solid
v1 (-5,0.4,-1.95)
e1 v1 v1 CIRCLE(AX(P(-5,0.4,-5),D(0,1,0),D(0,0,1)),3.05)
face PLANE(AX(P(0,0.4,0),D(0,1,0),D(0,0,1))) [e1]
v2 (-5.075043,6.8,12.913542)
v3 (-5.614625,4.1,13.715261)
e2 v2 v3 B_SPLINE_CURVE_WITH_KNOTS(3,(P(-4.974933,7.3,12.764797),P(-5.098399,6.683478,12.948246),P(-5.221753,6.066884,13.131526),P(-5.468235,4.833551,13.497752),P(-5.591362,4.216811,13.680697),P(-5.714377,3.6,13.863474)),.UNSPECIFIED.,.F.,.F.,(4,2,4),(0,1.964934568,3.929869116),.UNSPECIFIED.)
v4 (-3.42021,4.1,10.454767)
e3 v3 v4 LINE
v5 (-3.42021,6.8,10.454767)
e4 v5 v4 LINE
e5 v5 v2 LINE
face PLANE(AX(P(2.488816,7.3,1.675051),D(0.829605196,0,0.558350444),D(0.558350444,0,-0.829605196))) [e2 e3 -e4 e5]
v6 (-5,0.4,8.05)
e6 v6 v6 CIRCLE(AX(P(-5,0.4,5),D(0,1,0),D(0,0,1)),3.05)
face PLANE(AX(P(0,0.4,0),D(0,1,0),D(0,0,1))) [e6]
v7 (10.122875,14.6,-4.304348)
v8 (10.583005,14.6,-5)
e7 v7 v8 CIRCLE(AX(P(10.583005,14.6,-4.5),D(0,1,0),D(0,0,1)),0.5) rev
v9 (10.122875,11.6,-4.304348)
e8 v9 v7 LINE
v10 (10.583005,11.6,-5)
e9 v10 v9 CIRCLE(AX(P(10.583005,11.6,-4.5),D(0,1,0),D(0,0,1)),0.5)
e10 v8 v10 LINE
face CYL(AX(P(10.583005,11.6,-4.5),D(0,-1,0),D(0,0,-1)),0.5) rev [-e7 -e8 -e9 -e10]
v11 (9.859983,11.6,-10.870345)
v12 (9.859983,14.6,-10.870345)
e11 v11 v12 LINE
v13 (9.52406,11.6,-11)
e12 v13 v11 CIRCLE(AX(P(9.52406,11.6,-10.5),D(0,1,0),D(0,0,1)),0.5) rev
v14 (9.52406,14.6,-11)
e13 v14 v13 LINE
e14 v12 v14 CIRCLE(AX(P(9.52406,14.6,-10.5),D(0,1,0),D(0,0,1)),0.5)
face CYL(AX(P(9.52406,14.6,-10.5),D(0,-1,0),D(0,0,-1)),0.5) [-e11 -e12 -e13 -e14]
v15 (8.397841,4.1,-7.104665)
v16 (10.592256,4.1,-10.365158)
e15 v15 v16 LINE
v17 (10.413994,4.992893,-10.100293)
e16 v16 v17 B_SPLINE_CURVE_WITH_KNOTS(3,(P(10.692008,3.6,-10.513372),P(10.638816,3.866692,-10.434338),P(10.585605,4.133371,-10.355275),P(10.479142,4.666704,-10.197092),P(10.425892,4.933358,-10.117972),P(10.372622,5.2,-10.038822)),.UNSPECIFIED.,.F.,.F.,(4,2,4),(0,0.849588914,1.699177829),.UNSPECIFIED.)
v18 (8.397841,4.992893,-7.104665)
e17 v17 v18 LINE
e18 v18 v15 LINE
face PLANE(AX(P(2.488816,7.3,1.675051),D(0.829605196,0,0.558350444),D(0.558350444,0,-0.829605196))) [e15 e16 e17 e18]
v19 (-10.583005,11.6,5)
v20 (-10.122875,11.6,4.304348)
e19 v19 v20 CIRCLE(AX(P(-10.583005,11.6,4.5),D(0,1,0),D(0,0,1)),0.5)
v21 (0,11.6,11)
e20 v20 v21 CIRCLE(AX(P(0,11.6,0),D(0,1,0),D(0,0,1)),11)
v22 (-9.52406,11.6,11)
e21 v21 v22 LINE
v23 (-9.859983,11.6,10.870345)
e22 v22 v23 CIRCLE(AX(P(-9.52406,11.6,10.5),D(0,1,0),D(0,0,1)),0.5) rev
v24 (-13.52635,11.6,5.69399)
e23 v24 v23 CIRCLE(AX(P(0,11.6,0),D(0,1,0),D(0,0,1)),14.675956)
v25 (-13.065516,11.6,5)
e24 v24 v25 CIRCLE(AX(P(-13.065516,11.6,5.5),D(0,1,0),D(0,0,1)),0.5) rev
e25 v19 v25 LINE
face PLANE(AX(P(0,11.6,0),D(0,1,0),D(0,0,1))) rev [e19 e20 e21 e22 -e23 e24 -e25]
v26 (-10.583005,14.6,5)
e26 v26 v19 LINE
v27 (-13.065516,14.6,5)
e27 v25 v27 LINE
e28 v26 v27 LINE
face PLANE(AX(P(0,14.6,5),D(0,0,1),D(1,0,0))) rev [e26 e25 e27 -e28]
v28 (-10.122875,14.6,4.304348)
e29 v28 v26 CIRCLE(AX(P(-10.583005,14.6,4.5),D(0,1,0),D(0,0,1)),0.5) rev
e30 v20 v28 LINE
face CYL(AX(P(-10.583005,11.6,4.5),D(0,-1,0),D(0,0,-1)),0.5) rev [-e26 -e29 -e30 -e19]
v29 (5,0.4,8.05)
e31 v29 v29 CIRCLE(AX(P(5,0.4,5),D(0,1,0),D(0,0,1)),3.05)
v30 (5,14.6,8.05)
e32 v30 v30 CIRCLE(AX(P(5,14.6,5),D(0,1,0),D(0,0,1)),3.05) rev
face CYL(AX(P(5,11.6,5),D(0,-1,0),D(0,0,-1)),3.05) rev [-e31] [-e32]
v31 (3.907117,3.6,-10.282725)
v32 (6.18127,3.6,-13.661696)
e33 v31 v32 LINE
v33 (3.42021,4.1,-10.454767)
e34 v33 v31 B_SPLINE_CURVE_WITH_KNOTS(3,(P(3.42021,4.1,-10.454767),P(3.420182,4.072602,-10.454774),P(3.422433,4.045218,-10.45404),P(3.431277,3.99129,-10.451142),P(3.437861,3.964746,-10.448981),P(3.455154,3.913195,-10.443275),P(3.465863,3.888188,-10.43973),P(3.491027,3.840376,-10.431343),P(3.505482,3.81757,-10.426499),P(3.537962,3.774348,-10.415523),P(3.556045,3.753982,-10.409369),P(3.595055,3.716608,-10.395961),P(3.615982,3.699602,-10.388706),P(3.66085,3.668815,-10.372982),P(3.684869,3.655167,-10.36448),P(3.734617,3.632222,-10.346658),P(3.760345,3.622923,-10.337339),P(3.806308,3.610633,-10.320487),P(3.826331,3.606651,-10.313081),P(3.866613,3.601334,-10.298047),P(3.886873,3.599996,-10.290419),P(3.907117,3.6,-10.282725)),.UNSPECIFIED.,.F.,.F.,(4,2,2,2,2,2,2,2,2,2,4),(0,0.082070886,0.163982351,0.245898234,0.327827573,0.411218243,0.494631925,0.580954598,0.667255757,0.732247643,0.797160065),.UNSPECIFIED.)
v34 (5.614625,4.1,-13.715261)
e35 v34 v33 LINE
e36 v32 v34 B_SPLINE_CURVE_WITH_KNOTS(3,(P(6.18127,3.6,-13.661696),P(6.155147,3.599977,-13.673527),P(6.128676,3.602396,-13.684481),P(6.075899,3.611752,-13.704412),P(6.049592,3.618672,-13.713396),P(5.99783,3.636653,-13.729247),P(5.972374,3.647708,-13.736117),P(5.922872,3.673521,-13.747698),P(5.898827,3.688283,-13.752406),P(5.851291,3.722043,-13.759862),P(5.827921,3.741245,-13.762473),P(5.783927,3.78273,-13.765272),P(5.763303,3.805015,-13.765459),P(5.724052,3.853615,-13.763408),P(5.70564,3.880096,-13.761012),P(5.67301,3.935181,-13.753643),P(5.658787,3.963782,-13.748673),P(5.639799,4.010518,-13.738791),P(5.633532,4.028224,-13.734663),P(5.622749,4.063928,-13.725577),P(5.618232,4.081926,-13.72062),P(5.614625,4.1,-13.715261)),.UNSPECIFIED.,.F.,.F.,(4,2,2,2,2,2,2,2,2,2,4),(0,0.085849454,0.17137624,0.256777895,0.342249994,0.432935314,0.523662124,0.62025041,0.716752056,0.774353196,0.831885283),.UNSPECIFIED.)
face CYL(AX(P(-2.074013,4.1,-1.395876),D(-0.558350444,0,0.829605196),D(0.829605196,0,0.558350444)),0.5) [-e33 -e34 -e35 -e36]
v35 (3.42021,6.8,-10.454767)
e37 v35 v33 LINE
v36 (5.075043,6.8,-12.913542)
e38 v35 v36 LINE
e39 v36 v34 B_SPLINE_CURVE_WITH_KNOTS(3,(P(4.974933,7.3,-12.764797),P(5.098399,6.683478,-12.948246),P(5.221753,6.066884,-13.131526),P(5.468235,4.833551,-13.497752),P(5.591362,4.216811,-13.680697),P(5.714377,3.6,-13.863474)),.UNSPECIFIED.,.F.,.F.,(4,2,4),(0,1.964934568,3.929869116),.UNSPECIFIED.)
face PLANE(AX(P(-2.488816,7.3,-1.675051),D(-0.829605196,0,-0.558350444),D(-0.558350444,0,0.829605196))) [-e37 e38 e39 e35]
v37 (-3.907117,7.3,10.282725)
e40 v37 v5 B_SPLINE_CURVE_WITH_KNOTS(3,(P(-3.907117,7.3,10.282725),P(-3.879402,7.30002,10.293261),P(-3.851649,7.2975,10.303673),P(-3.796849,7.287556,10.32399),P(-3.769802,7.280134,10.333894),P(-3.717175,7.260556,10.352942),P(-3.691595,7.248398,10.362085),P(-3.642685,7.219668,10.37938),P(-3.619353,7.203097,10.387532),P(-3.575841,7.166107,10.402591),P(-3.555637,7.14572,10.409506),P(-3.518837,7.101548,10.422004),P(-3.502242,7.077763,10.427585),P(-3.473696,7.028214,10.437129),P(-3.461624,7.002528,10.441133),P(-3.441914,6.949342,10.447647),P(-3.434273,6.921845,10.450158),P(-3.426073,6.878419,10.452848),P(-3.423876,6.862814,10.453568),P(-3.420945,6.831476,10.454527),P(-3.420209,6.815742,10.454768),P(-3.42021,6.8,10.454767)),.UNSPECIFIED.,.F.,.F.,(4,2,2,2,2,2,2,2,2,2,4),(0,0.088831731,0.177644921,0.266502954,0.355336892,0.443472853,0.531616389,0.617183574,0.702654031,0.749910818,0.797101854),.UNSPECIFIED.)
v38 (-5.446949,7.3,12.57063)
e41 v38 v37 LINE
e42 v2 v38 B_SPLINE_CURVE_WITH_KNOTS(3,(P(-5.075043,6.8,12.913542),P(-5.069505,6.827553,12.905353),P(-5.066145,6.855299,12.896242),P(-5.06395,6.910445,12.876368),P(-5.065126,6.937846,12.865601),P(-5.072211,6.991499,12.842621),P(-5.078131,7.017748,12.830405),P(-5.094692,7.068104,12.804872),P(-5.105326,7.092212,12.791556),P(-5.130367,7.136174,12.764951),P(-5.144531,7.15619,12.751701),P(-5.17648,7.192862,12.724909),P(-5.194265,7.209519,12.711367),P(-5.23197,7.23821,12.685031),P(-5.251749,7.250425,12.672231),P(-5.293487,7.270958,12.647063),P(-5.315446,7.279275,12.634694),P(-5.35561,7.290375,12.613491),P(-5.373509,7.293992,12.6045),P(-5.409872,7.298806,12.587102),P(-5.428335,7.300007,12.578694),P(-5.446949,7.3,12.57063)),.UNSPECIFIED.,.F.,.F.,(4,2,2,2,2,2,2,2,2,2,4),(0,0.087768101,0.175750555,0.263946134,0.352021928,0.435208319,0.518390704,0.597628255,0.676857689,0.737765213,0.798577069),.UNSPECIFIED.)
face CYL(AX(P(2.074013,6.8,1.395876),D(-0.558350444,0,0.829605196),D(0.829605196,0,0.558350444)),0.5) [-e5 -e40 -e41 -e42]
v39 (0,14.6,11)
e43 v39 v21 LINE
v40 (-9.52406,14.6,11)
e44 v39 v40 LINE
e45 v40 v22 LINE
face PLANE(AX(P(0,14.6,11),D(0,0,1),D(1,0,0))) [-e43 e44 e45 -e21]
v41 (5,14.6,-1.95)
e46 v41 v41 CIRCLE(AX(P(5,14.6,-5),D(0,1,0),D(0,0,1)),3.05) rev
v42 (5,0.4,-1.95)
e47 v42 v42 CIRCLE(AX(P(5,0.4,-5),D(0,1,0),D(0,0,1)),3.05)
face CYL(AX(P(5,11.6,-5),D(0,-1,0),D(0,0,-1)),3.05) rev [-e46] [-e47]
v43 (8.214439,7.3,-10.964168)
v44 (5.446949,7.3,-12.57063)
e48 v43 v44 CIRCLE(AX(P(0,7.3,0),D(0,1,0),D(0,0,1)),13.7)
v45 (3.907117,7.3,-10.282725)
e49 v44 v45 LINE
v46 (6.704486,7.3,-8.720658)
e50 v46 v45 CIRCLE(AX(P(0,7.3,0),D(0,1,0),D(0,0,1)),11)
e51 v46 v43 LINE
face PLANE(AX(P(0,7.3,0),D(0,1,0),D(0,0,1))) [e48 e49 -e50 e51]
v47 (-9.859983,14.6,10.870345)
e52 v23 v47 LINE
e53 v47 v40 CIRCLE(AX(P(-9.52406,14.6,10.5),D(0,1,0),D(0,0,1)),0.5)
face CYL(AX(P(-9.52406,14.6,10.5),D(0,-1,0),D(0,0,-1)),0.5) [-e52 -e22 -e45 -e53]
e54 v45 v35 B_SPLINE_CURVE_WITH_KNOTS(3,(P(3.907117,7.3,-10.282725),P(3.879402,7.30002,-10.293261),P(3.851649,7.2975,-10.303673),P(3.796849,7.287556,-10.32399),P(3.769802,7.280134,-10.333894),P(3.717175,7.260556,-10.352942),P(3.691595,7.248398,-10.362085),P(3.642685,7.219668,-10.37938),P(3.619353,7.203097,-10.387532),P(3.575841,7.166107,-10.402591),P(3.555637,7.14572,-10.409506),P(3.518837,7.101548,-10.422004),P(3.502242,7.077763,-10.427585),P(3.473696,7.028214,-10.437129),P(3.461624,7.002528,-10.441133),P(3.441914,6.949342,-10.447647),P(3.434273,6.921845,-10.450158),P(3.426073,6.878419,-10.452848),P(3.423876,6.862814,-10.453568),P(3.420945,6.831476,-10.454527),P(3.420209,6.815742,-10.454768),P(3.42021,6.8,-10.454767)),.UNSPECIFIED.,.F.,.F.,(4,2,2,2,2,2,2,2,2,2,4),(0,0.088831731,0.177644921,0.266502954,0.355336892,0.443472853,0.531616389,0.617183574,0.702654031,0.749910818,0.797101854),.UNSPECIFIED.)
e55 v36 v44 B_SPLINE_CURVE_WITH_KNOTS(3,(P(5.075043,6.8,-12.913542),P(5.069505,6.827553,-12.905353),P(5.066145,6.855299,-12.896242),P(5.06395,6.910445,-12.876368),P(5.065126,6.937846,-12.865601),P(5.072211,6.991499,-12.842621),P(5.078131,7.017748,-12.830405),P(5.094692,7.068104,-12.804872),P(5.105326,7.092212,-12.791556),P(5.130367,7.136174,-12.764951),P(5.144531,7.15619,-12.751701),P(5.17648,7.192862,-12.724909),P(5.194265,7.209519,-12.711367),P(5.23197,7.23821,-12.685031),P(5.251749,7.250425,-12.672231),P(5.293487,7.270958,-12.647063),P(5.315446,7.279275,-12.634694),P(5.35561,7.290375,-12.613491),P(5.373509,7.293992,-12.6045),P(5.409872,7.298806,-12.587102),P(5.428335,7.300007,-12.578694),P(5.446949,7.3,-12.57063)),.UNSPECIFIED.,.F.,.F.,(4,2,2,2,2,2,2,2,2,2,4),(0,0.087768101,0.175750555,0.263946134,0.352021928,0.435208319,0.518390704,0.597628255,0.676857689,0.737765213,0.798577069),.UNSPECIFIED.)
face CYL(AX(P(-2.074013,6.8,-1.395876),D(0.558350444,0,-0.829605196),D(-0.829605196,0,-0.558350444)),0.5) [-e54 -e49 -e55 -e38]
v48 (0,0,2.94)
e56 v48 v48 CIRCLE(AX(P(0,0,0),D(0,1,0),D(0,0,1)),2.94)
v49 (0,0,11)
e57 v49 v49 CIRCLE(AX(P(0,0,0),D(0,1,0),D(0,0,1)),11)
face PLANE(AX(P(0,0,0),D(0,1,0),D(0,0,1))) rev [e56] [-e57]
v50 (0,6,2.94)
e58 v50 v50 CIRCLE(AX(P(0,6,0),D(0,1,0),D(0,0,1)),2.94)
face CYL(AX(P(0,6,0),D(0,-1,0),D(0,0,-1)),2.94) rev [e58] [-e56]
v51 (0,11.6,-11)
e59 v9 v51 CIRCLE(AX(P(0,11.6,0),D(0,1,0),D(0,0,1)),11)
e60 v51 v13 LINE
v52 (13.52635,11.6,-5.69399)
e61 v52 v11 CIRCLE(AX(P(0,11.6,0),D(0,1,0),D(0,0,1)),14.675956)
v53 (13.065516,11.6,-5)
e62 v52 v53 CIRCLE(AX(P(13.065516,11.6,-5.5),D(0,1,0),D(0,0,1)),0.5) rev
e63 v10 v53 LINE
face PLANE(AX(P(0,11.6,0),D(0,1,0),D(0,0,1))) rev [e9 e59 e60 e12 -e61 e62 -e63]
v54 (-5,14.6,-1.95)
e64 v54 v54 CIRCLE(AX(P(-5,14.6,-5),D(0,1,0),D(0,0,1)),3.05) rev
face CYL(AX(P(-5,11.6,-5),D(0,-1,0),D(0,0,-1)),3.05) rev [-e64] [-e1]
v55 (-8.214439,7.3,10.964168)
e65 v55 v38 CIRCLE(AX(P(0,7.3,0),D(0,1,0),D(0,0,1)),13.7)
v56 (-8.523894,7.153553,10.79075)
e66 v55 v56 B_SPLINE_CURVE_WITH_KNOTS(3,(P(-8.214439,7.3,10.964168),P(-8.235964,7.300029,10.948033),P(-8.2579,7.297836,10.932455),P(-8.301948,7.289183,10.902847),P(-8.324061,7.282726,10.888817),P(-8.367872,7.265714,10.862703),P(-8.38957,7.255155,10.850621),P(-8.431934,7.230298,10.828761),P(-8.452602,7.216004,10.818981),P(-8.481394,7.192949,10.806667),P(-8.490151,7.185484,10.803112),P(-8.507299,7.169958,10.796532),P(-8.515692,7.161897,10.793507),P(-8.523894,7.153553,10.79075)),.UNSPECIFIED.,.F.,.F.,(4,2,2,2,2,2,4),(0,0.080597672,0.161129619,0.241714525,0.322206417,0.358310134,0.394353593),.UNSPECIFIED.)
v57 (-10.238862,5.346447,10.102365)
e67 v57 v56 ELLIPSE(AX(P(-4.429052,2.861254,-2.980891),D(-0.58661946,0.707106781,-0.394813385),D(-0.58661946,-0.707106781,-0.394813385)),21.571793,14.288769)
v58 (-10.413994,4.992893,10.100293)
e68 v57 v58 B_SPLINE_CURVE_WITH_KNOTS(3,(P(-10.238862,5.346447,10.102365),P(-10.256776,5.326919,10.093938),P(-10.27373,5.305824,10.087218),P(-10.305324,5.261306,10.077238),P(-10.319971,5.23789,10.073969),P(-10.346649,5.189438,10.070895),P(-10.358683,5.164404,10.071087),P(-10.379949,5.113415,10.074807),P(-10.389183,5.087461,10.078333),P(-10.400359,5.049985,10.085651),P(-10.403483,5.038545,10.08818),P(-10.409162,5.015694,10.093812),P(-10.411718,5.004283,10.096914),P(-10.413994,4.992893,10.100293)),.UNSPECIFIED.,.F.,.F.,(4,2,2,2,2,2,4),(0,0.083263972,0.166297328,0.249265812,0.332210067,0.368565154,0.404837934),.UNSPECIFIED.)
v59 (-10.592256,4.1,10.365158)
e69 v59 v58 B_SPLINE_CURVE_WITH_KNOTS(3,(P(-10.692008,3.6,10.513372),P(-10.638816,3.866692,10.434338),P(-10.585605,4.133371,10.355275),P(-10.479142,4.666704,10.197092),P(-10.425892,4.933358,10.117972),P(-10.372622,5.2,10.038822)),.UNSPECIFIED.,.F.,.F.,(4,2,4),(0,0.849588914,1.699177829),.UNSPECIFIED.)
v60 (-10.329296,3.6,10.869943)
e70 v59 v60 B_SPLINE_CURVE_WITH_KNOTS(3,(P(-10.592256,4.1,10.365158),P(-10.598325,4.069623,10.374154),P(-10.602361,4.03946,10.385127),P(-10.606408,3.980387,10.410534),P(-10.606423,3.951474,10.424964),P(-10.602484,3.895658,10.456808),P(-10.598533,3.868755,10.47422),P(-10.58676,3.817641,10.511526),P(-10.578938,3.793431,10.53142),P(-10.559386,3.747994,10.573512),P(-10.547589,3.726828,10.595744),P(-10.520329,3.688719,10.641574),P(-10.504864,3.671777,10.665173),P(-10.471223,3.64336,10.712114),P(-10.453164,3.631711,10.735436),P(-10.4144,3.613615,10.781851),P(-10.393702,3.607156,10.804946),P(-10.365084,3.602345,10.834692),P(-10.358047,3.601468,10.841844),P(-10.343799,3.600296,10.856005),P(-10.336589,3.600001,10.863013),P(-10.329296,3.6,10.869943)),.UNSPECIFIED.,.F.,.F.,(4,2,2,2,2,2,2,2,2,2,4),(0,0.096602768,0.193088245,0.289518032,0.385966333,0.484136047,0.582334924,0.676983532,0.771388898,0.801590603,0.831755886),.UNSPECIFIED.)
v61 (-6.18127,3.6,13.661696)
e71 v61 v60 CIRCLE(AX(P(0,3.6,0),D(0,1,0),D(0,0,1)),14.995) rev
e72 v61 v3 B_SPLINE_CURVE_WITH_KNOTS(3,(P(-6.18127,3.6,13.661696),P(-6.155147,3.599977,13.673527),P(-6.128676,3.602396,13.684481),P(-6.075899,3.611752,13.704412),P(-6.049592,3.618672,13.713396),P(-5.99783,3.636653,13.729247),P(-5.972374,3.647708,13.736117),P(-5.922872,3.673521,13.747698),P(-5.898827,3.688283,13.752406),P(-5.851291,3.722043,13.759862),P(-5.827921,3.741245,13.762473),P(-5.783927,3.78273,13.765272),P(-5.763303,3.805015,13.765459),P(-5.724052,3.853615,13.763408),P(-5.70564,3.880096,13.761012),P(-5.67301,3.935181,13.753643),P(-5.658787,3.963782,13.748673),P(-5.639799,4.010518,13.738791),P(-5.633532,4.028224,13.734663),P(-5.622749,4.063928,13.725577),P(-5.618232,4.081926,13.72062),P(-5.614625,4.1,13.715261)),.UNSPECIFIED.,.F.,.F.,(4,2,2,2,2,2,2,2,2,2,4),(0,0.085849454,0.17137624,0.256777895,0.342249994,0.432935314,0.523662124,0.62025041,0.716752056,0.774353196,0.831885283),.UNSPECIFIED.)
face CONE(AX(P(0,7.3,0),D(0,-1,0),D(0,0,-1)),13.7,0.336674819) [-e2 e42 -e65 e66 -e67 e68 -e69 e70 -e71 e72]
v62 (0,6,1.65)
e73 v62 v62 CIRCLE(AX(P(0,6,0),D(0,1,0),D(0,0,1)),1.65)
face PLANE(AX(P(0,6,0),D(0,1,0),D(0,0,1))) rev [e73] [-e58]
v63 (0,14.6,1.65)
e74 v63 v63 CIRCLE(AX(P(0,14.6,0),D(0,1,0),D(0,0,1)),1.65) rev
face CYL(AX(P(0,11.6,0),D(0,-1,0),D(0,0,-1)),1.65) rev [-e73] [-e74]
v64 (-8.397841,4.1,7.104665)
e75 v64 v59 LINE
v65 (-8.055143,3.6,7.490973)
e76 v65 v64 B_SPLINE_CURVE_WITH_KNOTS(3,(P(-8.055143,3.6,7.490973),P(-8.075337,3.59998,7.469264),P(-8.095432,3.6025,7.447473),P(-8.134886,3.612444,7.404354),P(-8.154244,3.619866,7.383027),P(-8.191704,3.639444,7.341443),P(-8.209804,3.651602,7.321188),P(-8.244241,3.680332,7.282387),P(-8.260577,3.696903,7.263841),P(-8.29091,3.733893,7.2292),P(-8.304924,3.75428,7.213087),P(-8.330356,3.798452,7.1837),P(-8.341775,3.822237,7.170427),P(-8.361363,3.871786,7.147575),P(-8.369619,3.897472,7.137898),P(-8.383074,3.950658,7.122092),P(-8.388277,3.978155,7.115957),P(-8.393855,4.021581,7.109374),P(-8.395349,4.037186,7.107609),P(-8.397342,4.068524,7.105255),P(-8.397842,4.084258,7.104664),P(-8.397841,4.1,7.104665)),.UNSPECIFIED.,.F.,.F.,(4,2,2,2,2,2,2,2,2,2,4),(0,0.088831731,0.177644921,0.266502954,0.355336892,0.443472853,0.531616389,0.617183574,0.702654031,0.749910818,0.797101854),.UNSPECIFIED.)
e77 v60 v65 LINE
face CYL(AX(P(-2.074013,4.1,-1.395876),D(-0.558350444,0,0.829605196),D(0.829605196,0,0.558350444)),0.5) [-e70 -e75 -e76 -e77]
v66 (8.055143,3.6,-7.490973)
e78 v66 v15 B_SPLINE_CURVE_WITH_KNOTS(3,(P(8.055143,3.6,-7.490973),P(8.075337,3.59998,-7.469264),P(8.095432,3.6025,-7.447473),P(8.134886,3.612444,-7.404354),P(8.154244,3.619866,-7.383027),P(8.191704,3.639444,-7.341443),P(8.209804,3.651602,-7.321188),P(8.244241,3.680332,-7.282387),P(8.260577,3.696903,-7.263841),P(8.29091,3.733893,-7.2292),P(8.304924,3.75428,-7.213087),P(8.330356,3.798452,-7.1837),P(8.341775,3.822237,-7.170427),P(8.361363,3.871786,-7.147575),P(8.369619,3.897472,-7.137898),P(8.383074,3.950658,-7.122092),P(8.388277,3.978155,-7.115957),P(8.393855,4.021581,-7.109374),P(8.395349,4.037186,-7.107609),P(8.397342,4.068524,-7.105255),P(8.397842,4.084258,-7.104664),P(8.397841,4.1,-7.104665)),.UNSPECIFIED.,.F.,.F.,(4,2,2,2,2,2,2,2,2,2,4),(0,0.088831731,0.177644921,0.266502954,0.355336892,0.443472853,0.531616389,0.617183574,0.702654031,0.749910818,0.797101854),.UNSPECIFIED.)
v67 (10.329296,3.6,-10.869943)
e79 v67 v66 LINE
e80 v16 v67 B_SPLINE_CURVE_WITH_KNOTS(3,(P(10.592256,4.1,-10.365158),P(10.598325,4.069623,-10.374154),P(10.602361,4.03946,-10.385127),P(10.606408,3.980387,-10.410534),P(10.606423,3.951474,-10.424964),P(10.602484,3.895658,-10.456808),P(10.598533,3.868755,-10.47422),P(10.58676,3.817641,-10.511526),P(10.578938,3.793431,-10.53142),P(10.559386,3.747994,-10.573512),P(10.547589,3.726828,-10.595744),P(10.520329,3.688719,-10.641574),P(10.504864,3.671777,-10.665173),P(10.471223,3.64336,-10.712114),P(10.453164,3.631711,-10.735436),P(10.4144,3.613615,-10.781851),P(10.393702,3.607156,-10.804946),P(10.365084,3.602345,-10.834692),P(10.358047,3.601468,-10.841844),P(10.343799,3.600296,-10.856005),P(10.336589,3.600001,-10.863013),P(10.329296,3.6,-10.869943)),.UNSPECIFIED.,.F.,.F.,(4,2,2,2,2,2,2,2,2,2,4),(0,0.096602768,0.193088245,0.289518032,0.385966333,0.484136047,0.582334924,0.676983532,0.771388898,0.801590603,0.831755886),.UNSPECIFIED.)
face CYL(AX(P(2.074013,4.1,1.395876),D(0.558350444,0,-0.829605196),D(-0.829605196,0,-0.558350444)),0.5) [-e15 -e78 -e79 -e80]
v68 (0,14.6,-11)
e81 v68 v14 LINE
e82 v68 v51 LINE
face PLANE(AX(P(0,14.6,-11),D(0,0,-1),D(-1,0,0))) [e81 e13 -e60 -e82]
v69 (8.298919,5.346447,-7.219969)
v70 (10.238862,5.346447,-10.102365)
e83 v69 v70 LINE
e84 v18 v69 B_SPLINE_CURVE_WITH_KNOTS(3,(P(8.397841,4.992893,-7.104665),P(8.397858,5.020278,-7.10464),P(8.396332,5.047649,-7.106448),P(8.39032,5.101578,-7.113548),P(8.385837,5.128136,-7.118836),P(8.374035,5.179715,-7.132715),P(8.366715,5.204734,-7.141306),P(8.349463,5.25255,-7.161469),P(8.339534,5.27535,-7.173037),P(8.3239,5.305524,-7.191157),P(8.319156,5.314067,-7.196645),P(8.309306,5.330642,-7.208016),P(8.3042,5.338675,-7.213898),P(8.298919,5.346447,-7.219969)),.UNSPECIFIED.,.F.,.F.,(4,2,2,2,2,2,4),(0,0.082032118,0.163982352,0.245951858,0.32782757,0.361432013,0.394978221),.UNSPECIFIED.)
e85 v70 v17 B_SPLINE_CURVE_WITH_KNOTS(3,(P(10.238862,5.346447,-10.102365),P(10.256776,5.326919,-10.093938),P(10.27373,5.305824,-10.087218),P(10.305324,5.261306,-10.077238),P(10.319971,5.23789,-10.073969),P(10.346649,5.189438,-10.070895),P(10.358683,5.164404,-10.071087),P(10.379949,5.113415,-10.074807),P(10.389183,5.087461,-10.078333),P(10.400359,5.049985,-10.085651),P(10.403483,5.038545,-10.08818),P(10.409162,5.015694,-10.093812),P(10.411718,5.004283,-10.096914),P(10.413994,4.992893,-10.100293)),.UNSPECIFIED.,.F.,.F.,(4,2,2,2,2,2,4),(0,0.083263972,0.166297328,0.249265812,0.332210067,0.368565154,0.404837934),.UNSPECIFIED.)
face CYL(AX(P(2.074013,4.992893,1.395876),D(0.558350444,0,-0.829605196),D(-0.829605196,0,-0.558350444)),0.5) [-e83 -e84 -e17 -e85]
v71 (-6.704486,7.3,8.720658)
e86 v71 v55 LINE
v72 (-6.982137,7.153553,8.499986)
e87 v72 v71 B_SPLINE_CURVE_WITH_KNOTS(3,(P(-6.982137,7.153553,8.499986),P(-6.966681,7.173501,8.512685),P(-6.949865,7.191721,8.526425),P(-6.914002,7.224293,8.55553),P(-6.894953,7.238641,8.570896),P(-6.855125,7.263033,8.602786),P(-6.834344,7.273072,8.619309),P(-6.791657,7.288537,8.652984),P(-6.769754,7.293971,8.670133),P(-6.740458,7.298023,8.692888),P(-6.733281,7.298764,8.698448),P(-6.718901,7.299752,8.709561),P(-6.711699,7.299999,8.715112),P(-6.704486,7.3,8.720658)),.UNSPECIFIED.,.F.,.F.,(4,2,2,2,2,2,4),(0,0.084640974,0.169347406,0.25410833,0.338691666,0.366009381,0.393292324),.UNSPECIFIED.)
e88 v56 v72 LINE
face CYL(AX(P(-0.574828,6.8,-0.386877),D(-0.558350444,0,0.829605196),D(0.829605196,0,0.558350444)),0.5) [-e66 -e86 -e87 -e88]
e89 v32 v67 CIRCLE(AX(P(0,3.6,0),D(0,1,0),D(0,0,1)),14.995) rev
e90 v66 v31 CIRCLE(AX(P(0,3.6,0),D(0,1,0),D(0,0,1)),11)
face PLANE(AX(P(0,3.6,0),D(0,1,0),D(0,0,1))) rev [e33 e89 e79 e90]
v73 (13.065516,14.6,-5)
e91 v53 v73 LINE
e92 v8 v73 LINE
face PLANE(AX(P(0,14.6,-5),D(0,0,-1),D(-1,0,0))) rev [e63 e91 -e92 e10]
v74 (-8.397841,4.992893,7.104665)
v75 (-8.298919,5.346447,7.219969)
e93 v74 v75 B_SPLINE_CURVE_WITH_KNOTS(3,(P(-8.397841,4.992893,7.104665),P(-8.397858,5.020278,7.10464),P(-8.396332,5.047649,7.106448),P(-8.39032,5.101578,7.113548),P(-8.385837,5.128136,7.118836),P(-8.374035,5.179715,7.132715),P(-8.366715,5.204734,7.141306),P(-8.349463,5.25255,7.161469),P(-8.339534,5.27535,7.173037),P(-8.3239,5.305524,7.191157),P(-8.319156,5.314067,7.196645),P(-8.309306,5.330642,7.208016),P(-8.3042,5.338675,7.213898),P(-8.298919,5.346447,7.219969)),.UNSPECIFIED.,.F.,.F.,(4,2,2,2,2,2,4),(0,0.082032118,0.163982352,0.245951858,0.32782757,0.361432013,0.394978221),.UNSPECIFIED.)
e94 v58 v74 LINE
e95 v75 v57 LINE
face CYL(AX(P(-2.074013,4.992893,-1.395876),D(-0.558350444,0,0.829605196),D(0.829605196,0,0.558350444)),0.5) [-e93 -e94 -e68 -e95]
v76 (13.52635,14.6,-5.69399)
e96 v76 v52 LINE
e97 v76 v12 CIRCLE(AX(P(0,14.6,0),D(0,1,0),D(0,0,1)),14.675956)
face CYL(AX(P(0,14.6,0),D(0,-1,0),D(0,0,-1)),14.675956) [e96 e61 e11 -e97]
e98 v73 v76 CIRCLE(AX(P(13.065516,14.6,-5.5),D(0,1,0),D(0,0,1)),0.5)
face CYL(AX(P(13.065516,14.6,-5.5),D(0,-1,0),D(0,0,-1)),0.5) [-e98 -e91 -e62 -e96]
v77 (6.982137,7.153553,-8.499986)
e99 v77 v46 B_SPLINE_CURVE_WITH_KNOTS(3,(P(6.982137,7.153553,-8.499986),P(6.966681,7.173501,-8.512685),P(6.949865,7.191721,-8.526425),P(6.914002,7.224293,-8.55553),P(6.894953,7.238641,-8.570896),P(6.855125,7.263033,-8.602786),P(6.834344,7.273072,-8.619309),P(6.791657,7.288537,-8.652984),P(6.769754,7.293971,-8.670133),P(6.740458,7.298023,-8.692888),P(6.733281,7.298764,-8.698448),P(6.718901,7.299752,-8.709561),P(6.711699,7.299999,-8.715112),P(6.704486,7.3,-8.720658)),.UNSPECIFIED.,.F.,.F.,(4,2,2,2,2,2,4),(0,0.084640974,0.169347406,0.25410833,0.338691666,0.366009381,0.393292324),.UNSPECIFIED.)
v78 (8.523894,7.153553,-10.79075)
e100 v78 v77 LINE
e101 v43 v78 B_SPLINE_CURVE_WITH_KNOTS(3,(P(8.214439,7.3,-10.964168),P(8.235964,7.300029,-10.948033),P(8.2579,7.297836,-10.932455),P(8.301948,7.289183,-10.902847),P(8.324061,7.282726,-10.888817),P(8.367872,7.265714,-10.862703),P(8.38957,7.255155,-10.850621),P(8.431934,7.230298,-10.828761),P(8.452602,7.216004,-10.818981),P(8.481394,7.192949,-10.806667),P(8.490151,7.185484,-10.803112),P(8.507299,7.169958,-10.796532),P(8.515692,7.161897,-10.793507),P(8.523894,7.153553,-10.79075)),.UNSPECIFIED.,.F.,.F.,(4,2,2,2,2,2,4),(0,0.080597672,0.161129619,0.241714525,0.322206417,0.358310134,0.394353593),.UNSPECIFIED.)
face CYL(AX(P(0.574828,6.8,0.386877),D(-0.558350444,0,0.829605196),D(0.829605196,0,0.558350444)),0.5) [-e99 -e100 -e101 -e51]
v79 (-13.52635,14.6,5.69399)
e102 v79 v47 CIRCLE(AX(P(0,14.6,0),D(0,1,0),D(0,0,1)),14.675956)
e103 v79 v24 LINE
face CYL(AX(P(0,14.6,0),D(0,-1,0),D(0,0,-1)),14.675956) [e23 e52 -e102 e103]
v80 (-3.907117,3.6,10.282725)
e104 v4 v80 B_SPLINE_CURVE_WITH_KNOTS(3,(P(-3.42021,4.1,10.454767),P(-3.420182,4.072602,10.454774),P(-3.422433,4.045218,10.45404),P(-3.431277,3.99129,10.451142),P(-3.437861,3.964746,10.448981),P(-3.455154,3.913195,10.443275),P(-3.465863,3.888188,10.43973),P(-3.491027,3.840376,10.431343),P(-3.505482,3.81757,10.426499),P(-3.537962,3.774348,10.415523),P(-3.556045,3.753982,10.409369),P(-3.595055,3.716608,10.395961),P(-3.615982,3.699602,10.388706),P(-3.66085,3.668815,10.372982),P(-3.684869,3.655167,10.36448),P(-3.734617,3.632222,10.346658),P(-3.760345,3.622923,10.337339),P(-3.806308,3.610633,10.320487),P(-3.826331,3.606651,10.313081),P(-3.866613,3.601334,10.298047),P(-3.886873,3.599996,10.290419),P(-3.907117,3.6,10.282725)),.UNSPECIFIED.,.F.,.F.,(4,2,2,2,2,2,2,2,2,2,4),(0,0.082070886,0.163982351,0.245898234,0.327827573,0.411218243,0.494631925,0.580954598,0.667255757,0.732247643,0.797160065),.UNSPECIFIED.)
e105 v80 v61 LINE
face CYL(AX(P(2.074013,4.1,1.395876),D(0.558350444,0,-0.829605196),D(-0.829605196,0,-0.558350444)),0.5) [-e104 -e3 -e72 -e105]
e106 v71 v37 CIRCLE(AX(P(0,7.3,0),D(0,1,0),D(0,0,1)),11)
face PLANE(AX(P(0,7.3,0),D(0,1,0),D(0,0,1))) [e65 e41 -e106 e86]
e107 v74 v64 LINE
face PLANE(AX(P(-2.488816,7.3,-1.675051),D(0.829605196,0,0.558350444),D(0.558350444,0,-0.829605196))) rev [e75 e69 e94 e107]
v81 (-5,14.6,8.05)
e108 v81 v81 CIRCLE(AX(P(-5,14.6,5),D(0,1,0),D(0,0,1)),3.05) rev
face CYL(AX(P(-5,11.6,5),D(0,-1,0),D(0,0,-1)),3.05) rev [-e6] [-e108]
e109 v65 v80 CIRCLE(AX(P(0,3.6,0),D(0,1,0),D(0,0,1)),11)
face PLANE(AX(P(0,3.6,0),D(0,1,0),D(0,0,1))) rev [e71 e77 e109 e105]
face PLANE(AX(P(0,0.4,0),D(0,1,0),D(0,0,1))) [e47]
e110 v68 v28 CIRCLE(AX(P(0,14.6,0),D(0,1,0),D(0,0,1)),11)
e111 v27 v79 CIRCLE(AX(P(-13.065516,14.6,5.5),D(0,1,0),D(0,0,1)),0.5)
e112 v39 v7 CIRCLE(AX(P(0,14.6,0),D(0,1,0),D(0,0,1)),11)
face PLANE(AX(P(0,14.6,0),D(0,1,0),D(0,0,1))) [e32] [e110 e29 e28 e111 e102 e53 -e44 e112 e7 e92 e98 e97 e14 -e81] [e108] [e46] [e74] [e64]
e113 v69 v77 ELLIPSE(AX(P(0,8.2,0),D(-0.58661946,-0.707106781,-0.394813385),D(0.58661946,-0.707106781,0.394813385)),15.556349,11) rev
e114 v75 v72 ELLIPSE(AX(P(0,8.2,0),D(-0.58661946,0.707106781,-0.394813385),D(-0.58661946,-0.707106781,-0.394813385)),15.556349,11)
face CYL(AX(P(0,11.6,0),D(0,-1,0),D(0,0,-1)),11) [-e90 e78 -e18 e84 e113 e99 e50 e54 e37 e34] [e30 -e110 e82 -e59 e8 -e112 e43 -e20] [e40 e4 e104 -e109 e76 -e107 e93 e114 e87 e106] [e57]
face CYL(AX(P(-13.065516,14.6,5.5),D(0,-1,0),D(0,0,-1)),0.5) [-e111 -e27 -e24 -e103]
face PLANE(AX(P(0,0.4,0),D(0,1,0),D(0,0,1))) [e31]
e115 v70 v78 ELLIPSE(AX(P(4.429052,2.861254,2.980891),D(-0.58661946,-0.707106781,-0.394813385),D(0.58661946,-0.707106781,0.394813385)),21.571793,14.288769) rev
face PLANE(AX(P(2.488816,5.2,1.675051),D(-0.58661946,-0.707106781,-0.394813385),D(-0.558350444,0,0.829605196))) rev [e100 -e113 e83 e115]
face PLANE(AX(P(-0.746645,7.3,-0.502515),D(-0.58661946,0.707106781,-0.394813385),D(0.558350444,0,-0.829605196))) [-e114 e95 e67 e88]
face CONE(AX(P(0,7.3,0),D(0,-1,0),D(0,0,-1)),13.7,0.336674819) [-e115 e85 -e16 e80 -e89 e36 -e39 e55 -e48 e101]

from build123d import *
from build123d.topology import SkipClean

# Parameters (mm, degrees)
SKETCH2_R           = 11
SKETCH2_R_2         = 2.94
SKETCH2_R_3         = 3.05
SKETCH2_R_4         = 1.65
BOSS_EXTRUDE2_DEPTH = 11.6
SKETCH2_10_R        = 3.05
BOSS_EXTRUDE3_DEPTH = 0.4
SKETCH2_13_R        = 2.94
SKETCH2_13_R_2      = 1.65
CUT_EXTRUDE1_DEPTH  = 6
BOSS_EXTRUDE4_DEPTH = 7.3
CUT_EXTRUDE2_DEPTH  = 3.6
CHAMFER1_SIZE       = 2.1
CHAMFER2_SIZE       = 1.4
CHAMFER2_SIZE_2     = 4
SKETCH3_R           = 11
SKETCH3_R_2         = 3.05
SKETCH3_R_3         = 1.65
BOSS_EXTRUDE5_DEPTH = 3
FILLET1_R           = 0.5


with BuildPart() as part:
    # Sketch2 → Boss-Extrude2 (new body)
    # profile 1 of 4: a face of its own
    with BuildSketch(Plane(origin=(0, 0, 0), x_dir=(1, 0, 0), z_dir=(0, 1, 0))):
        with Locations(Location((0, 0, 0), (0, 0, 270))):
            Circle(SKETCH2_R)
        Circle(SKETCH2_R_2, mode=Mode.SUBTRACT)
        with Locations(Location((-5, -5, 0), (0, 0, 270))):
            Circle(SKETCH2_R_3, mode=Mode.SUBTRACT)
        with Locations(Location((5, -5, 0), (0, 0, 270))):
            Circle(SKETCH2_R_3, mode=Mode.SUBTRACT)
        with Locations(Location((5, 5, 0), (0, 0, 270))):
            Circle(SKETCH2_R_3, mode=Mode.SUBTRACT)
        with Locations(Location((-5, 5, 0), (0, 0, 270))):
            Circle(SKETCH2_R_3, mode=Mode.SUBTRACT)
    # profile 2 of 4: a face of its own
    with BuildSketch(Plane(origin=(0, 0, 0), x_dir=(1, 0, 0), z_dir=(0, 1, 0))):
        Circle(SKETCH2_R_2)
        with Locations(Location((0, 0, 0), (0, 0, 270))):
            Circle(SKETCH2_R_4, mode=Mode.SUBTRACT)
    # profile 3 of 4: a face of its own
    with BuildSketch(Plane(origin=(0, 0, 0), x_dir=(1, 0, 0), z_dir=(0, 1, 0))):
        with BuildLine():
            Line((-3.420210086, -10.454767475), (-8.397841265, -7.104664812))
            ThreePointArc((-8.397841265, -7.104664812), (-6.141854882, -9.12565716), (-3.420210086, -10.454767475))
        make_face()
    # profile 4 of 4: a face of its own
    with BuildSketch(Plane(origin=(0, 0, 0), x_dir=(1, 0, 0), z_dir=(0, 1, 0))):
        with BuildLine():
            ThreePointArc((8.397841265, 7.104664812), (6.141854882, 9.12565716), (3.420210086, 10.454767475))
            Line((3.420210086, 10.454767475), (8.397841265, 7.104664812))
        make_face()
    extrude(amount=BOSS_EXTRUDE2_DEPTH)

    # Sketch2<10> → Boss-Extrude3 (add)
    with BuildSketch(Plane(origin=(0, 0, 0), x_dir=(1, 0, 0), z_dir=(0, 1, 0))):
        with Locations(Location((5, 5, 0), (0, 0, 270))):
            Circle(SKETCH2_10_R)
        with Locations(Location((-5, 5, 0), (0, 0, 270))):
            Circle(SKETCH2_10_R)
        with Locations(Location((5, -5, 0), (0, 0, 270))):
            Circle(SKETCH2_10_R)
        with Locations(Location((-5, -5, 0), (0, 0, 270))):
            Circle(SKETCH2_10_R)
    extrude(amount=BOSS_EXTRUDE3_DEPTH)

    # Sketch2<13> → Cut-Extrude1 (cut)
    with BuildSketch(Plane(origin=(0, 0, 0), x_dir=(1, 0, 0), z_dir=(0, 1, 0))):
        with Locations(Location((0, 0, 0), (0, 0, 270))):
            Circle(SKETCH2_13_R)
        with Locations(Location((0, 0, 0), (0, 0, 270))):
            Circle(SKETCH2_13_R_2, mode=Mode.SUBTRACT)
    extrude(amount=CUT_EXTRUDE1_DEPTH, mode=Mode.SUBTRACT)

    # Sketch2<15> → Boss-Extrude4 (add)
    with BuildSketch(Plane(origin=(0, 0, 0), x_dir=(1, 0, 0), z_dir=(0, 1, 0))):
        with BuildLine():
            Line((4.573820951, 12.168819249), (3.420210086, 10.454767475))
            ThreePointArc((3.420210086, 10.454767475), (6.141854882, 9.12565716), (8.397841265, 7.104664812))
            Line((8.397841265, 7.104664812), (9.55145213, 8.818716585))
            ThreePointArc((9.55145213, 8.818716585), (7.25855577, 10.784867553), (4.573820951, 12.168819249))
        make_face()
        with BuildLine():
            Line((5.774205065, 13.952367393), (4.573820951, 12.168819249))
            ThreePointArc((4.573820951, 12.168819249), (7.25855577, 10.784867553), (9.55145213, 8.818716585))
            Line((9.55145213, 8.818716585), (10.751836243, 10.60226473))
            ThreePointArc((10.751836243, 10.60226473), (8.431091702, 12.527038465), (5.774205065, 13.952367393))
        make_face()
        with BuildLine():
            ThreePointArc((-3.420210086, -10.454767475), (-6.141854882, -9.12565716), (-8.397841265, -7.104664812))
            Line((-8.397841265, -7.104664812), (-9.55145213, -8.818716585))
            ThreePointArc((-9.55145213, -8.818716585), (-7.25855577, -10.784867553), (-4.573820951, -12.168819249))
            Line((-4.573820951, -12.168819249), (-3.420210086, -10.454767475))
        make_face()
        with BuildLine():
            ThreePointArc((-4.573820951, -12.168819249), (-7.25855577, -10.784867553), (-9.55145213, -8.818716585))
            Line((-9.55145213, -8.818716585), (-10.751836243, -10.60226473))
            ThreePointArc((-10.751836243, -10.60226473), (-8.431091702, -12.527038465), (-5.774205065, -13.952367393))
            Line((-5.774205065, -13.952367393), (-4.573820951, -12.168819249))
        make_face()
    extrude(amount=BOSS_EXTRUDE4_DEPTH)

    # Sketch2<16> → Cut-Extrude2 (cut)
    with SkipClean():  # the faces are left unmerged after this step: merging them gives an invalid solid
        with BuildSketch(Plane(origin=(0, 0, 0), x_dir=(1, 0, 0), z_dir=(0, 1, 0))):
            with BuildLine():
                Line((5.774205065, 13.952367393), (4.573820951, 12.168819249))
                ThreePointArc((4.573820951, 12.168819249), (7.25855577, 10.784867553), (9.55145213, 8.818716585))
                Line((9.55145213, 8.818716585), (10.751836243, 10.60226473))
                ThreePointArc((10.751836243, 10.60226473), (8.431091702, 12.527038465), (5.774205065, 13.952367393))
            make_face()
            with BuildLine():
                Line((4.573820951, 12.168819249), (3.420210086, 10.454767475))
                ThreePointArc((3.420210086, 10.454767475), (6.141854882, 9.12565716), (8.397841265, 7.104664812))
                Line((8.397841265, 7.104664812), (9.55145213, 8.818716585))
                ThreePointArc((9.55145213, 8.818716585), (7.25855577, 10.784867553), (4.573820951, 12.168819249))
            make_face()
            with BuildLine():
                ThreePointArc((-3.420210086, -10.454767475), (-6.141854882, -9.12565716), (-8.397841265, -7.104664812))
                Line((-8.397841265, -7.104664812), (-9.55145213, -8.818716585))
                ThreePointArc((-9.55145213, -8.818716585), (-7.25855577, -10.784867553), (-4.573820951, -12.168819249))
                Line((-4.573820951, -12.168819249), (-3.420210086, -10.454767475))
            make_face()
            with BuildLine():
                ThreePointArc((-4.573820951, -12.168819249), (-7.25855577, -10.784867553), (-9.55145213, -8.818716585))
                Line((-9.55145213, -8.818716585), (-10.751836243, -10.60226473))
                ThreePointArc((-10.751836243, -10.60226473), (-8.431091702, -12.527038465), (-5.774205065, -13.952367393))
                Line((-5.774205065, -13.952367393), (-4.573820951, -12.168819249))
            make_face()
        extrude(amount=CUT_EXTRUDE2_DEPTH, mode=Mode.SUBTRACT)

    # Chamfer1
    # the kernel refuses this chamfer: 2.1 mm, written as the material it takes off along each edge
    with BuildSketch(Plane(origin=(5.382450555, 7.3, -2.624353515), x_dir=(-0.8292915366777964, 0.027495876610586525, -0.5581393409929051), z_dir=(0.558350443853296, 0, -0.8296051963728455))) as chamfer1_piece_1_section:
        Polygon((CHAMFER1_SIZE * 0.999621916911, -CHAMFER1_SIZE * 0.0274958766106), (-CHAMFER1_SIZE * 0.0274958766106, -CHAMFER1_SIZE * 0.999621916911), (0, 0), align=None)
    chamfer1_piece_1 = extrude(amount=15.017049757, mode=Mode.PRIVATE)
    chamfer1_piece_1 = chamfer1_piece_1 - Plane(origin=(0, 6.59835439, 0), x_dir=(0, 0, 1), z_dir=(0, -1, 0)) * Cylinder(11, 39, mode=Mode.PRIVATE)
    add(chamfer1_piece_1, mode=Mode.SUBTRACT)
    with BuildSketch(Plane(origin=(-5.382450555, 7.3, 2.624353515), x_dir=(-0.022810722114968995, -0.9996219169112966, -0.015352334909656337), z_dir=(-0.5583504438532961, 0, 0.8296051963728455))) as chamfer1_piece_2_section:
        Polygon((CHAMFER1_SIZE * 0.999621916911, CHAMFER1_SIZE * 0.0274958766106), (-CHAMFER1_SIZE * 0.0274958766106, CHAMFER1_SIZE * 0.999621916911), (0, 0), align=None)
    chamfer1_piece_2 = extrude(amount=15.017049757, mode=Mode.PRIVATE)
    chamfer1_piece_2 = chamfer1_piece_2 - Plane(origin=(0, 6.59835439, 0), x_dir=(0, 0, 1), z_dir=(0, -1, 0)) * Cylinder(11, 39, mode=Mode.PRIVATE)
    add(chamfer1_piece_2, mode=Mode.SUBTRACT)

    # Chamfer2
    # the kernel refuses this chamfer: 4, 1.4 mm, written as the material it takes off along each edge
    with BuildSketch(Plane(origin=(0, 7.3, 0), x_dir=(0.9733360776241976, 0, -0.2293836960098559), z_dir=(0.2293836960098559, 0, 0.9733360776241976))) as chamfer2_piece_1:
        Polygon((15.1 - CHAMFER2_SIZE, 0), (15.1, -CHAMFER2_SIZE_2), (15.1, 0), align=None)
    revolve(axis=Axis((0, 7.3, 0), (0, 1, 0)), revolution_arc=93.637337718, mode=Mode.SUBTRACT)
    with BuildSketch(Plane(origin=(0, 7.3, 0), x_dir=(-0.973336077624196, 0, 0.22938369600986216), z_dir=(-0.22938369600986216, 0, -0.973336077624196))) as chamfer2_piece_2:
        Polygon((15.1 - CHAMFER2_SIZE, 0), (15.1, -CHAMFER2_SIZE_2), (15.1, 0), align=None)
    revolve(axis=Axis((0, 7.3, 0), (0, 1, 0)), revolution_arc=93.637337718, mode=Mode.SUBTRACT)

    # Sketch3 → Boss-Extrude5 (add)
    # profile 1 of 3: a face of its own
    with BuildSketch(Plane(origin=(0, 11.6, 0), x_dir=(1, 0, 0), z_dir=(0, 1, 0))):
        with Locations(Location((0, 0, 0), (0, 0, 270))):
            Circle(SKETCH3_R)
        with Locations(Location((5, -5, 0), (0, 0, 270))):
            Circle(SKETCH3_R_2, mode=Mode.SUBTRACT)
        with Locations(Location((-5, 5, 0), (0, 0, 270))):
            Circle(SKETCH3_R_2, mode=Mode.SUBTRACT)
        with Locations(Location((0, 0, 0), (0, 0, 270))):
            Circle(SKETCH3_R_3, mode=Mode.SUBTRACT)
        with Locations(Location((5, 5, 0), (0, 0, 270))):
            Circle(SKETCH3_R_2, mode=Mode.SUBTRACT)
        with Locations(Location((-5, -5, 0), (0, 0, 270))):
            Circle(SKETCH3_R_2, mode=Mode.SUBTRACT)
    # profile 2 of 3: a face of its own
    with BuildSketch(Plane(origin=(0, 11.6, 0), x_dir=(1, 0, 0), z_dir=(0, 1, 0))):
        with BuildLine():
            ThreePointArc((0, 11), (5.744562647, 9.38083152), (9.797958971, 5))
            Line((9.797958971, 5), (13.797958971, 5))
            ThreePointArc((13.797958971, 5), (12.133272038, 8.256354003), (9.715125927, 11))
            Line((9.715125927, 11), (0, 11))
        make_face()
    # profile 3 of 3: a face of its own
    with BuildSketch(Plane(origin=(0, 11.6, 0), x_dir=(1, 0, 0), z_dir=(0, 1, 0))):
        with BuildLine():
            Line((-9.715125927, -11), (0, -11))
            ThreePointArc((0, -11), (-5.744562647, -9.38083152), (-9.797958971, -5))
            Line((-9.797958971, -5), (-13.797958971, -5))
            ThreePointArc((-13.797958971, -5), (-12.133272038, -8.256354003), (-9.715125927, -11))
        make_face()
    extrude(amount=BOSS_EXTRUDE5_DEPTH)

    # Fillet1
    # the kernel refuses this fillet: 0.5 mm, written as the material it adds along each edge
    with BuildSketch(Plane(origin=(9.797958971, 11.6, -5), x_dir=(0.4231826936389881, 0, 0.9060443740813416), z_dir=(0, 1, 0)), Plane(origin=(-9.797958971, 11.6, 5), x_dir=(-0.4231826936389887, 0, -0.9060443740813415), z_dir=(0, 1, 0))) as fillet1_piece_1:
        with BuildLine():
            CenterArc((0.785240184, 0.499695412), FILLET1_R, 154.964312052, 113.035684106)
            Line((0.332217996, 0.711286759), (0, 0))
            ThreePointArc((0, 0), (0.383895201, 0.006700929), (0.767790402, 0))
        make_face()
    extrude(amount=3)
    # the kernel refuses this fillet: 0.5 mm, written as the material it takes off along each edge
    with BuildSketch(Plane(origin=(-7.69990321, 3.6, 6.067658317), x_dir=(0, 1, 0), z_dir=(-0.5583504438532961, 0, 0.8296051963728454))) as fillet1_2_piece_1_section:
        with BuildLine():
            CenterArc((FILLET1_R, -FILLET1_R), FILLET1_R, 90, 90)
            Line((0, -FILLET1_R), (0, 0))
            Line((0, 0), (FILLET1_R, 0))
        make_face()
    fillet1_2_piece_1 = extrude(amount=6.608830073, mode=Mode.PRIVATE)
    fillet1_2_piece_1 = fillet1_2_piece_1 - Plane(origin=(0, 3.713543578, 0), x_dir=(0, 0, 1), z_dir=(0, -1, 0)) * Cylinder(11, 16, mode=Mode.PRIVATE)
    add(fillet1_2_piece_1, mode=Mode.SUBTRACT)
    with BuildSketch(Plane(origin=(-2.722272031, 3.6, 9.41776098), x_dir=(0, 1, 0), z_dir=(-0.5583504438533483, 0, 0.8296051963728102))) as fillet1_2_piece_2_section:
        with BuildLine():
            CenterArc((FILLET1_R, FILLET1_R), FILLET1_R, 180, 90)
            Line((0, FILLET1_R), (0, 0))
            Line((0, 0), (FILLET1_R, 0))
        make_face()
    fillet1_2_piece_2 = extrude(amount=6.608830073, mode=Mode.PRIVATE)
    fillet1_2_piece_2 = fillet1_2_piece_2 - Plane(origin=(0, 3.713543549, 0), x_dir=(0, 0, 1), z_dir=(0, -1, 0)) * Cylinder(11, 16, mode=Mode.PRIVATE)
    add(fillet1_2_piece_2, mode=Mode.SUBTRACT)
    with BuildSketch(Plane(origin=(-2.722272031, 7.3, 9.41776098), x_dir=(0, -1, 0), z_dir=(-0.5583504438533483, 0, 0.8296051963728102))) as fillet1_2_piece_3_section:
        with BuildLine():
            CenterArc((FILLET1_R, -FILLET1_R), FILLET1_R, 90, 90)
            Line((0, -FILLET1_R), (0, 0))
            Line((0, 0), (FILLET1_R, 0))
        make_face()
    fillet1_2_piece_3 = extrude(amount=5.284492652, mode=Mode.PRIVATE)
    fillet1_2_piece_3 = fillet1_2_piece_3 - Plane(origin=(0, 7.186341998, 0), x_dir=(0, 0, 1), z_dir=(0, -1, 0)) * Cylinder(11, 13, mode=Mode.PRIVATE)
    add(fillet1_2_piece_3, mode=Mode.SUBTRACT)
    with BuildSketch(Plane(origin=(-6.578812183, 7.3, 8.163003761), x_dir=(0.8296051963730308, 0, 0.5583504438530207), z_dir=(-0.5583504438530207, 0, 0.8296051963730307))) as fillet1_2_piece_4_section:
        with BuildLine():
            CenterArc((FILLET1_R * 0.414213562373, -FILLET1_R), FILLET1_R, 90, 45)
            Line((-FILLET1_R * 0.292893218813, -FILLET1_R * 0.292893218813), (0, 0))
            Line((0, 0), (FILLET1_R * 0.414213562373, 0))
        make_face()
    fillet1_2_piece_4 = extrude(amount=3.742819905, mode=Mode.PRIVATE)
    fillet1_2_piece_4 = fillet1_2_piece_4 - Plane(origin=(0, 7.269029723, 0), x_dir=(0, 0, 1), z_dir=(0, -1, 0)) * Cylinder(11, 9, mode=Mode.PRIVATE)
    add(fillet1_2_piece_4, mode=Mode.SUBTRACT)
    with BuildSketch(Plane(origin=(-8.108745857, 5.2, 6.675122658), x_dir=(0, -1, 0), z_dir=(-0.5583504438530207, 0, 0.8296051963730307))) as fillet1_2_piece_5_section:
        with BuildLine():
            CenterArc((FILLET1_R * 0.414213562373, FILLET1_R), FILLET1_R, 225, 45)
            Line((-FILLET1_R * 0.292893218813, FILLET1_R * 0.292893218814), (0, 0))
            Line((0, 0), (FILLET1_R * 0.414213562373, 0))
        make_face()
    fillet1_2_piece_5 = extrude(amount=4.57234541, mode=Mode.PRIVATE)
    fillet1_2_piece_5 = fillet1_2_piece_5 - Plane(origin=(0, 5.187022636, 0), x_dir=(0, 0, 1), z_dir=(0, -1, 0)) * Cylinder(11, 10, mode=Mode.PRIVATE)
    add(fillet1_2_piece_5, mode=Mode.SUBTRACT)
    with BuildSketch(Plane(origin=(6.412315236, 3.6, -14.900480751), x_dir=(0, 1, 0), z_dir=(-0.5583504438533491, 0, 0.8296051963728097))) as fillet1_2_piece_6_section:
        with BuildLine():
            CenterArc((FILLET1_R, -FILLET1_R), FILLET1_R, 90, 90)
            Line((0, -FILLET1_R), (0, 0))
            Line((0, 0), (FILLET1_R, 0))
        make_face()
    fillet1_2_piece_6 = extrude(amount=6.608830073, mode=Mode.PRIVATE)
    fillet1_2_piece_6 = fillet1_2_piece_6 - Plane(origin=(0, 3.713543535, 0), x_dir=(0, 0, 1), z_dir=(0, -1, 0)) * Cylinder(11, 16, mode=Mode.PRIVATE)
    add(fillet1_2_piece_6, mode=Mode.SUBTRACT)
    with BuildSketch(Plane(origin=(2.722272031, 7.3, -9.41776098), x_dir=(0, -1, 0), z_dir=(0.5583504438533491, 0, -0.8296051963728097))) as fillet1_2_piece_7_section:
        with BuildLine():
            CenterArc((FILLET1_R, -FILLET1_R), FILLET1_R, 90, 90)
            Line((0, -FILLET1_R), (0, 0))
            Line((0, 0), (FILLET1_R, 0))
        make_face()
    fillet1_2_piece_7 = extrude(amount=5.284492652, mode=Mode.PRIVATE)
    fillet1_2_piece_7 = fillet1_2_piece_7 - Plane(origin=(0, 7.18634201, 0), x_dir=(0, 0, 1), z_dir=(0, -1, 0)) * Cylinder(11, 13, mode=Mode.PRIVATE)
    add(fillet1_2_piece_7, mode=Mode.SUBTRACT)
    with BuildSketch(Plane(origin=(11.389946415, 3.6, -11.550378088), x_dir=(0, 1, 0), z_dir=(-0.558350443853296, 0, 0.8296051963728455))) as fillet1_2_piece_8_section:
        with BuildLine():
            CenterArc((FILLET1_R, FILLET1_R), FILLET1_R, 180, 90)
            Line((0, FILLET1_R), (0, 0))
            Line((0, 0), (FILLET1_R, 0))
        make_face()
    fillet1_2_piece_8 = extrude(amount=6.608830073, mode=Mode.PRIVATE)
    fillet1_2_piece_8 = fillet1_2_piece_8 - Plane(origin=(0, 3.713543574, 0), x_dir=(0, 0, 1), z_dir=(0, -1, 0)) * Cylinder(11, 16, mode=Mode.PRIVATE)
    add(fillet1_2_piece_8, mode=Mode.SUBTRACT)
    with BuildSketch(Plane(origin=(6.578812183, 7.3, -8.163003761), x_dir=(-0.8296051963730308, 0, -0.5583504438530207), z_dir=(0.5583504438530207, 0, -0.8296051963730307))) as fillet1_2_piece_9_section:
        with BuildLine():
            CenterArc((FILLET1_R * 0.414213562373, -FILLET1_R), FILLET1_R, 90, 45)
            Line((-FILLET1_R * 0.292893218814, -FILLET1_R * 0.292893218814), (0, 0))
            Line((0, 0), (FILLET1_R * 0.414213562373, 0))
        make_face()
    fillet1_2_piece_9 = extrude(amount=3.742819905, mode=Mode.PRIVATE)
    fillet1_2_piece_9 = fillet1_2_piece_9 - Plane(origin=(0, 7.269029723, 0), x_dir=(0, 0, 1), z_dir=(0, -1, 0)) * Cylinder(11, 9, mode=Mode.PRIVATE)
    add(fillet1_2_piece_9, mode=Mode.SUBTRACT)
    with BuildSketch(Plane(origin=(8.108745857, 5.2, -6.675122658), x_dir=(0, -1, 0), z_dir=(0.5583504438530207, 0, -0.8296051963730307))) as fillet1_2_piece_10_section:
        with BuildLine():
            CenterArc((FILLET1_R * 0.414213562373, FILLET1_R), FILLET1_R, 225, 45)
            Line((-FILLET1_R * 0.292893218813, FILLET1_R * 0.292893218813), (0, 0))
            Line((0, 0), (FILLET1_R * 0.414213562373, 0))
        make_face()
    fillet1_2_piece_10 = extrude(amount=4.57234541, mode=Mode.PRIVATE)
    fillet1_2_piece_10 = fillet1_2_piece_10 - Plane(origin=(0, 5.187022636, 0), x_dir=(0, 0, 1), z_dir=(0, -1, 0)) * Cylinder(11, 10, mode=Mode.PRIVATE)
    add(fillet1_2_piece_10, mode=Mode.SUBTRACT)
    with BuildSketch(Plane(origin=(13.797958971, 9.736880684, -5), x_dir=(-0.3644546021644692, 0, -0.9312211568478985), z_dir=(0, 1, 0)), Plane(origin=(-13.797958971, 9.736880684, 5), x_dir=(0.3644546021644716, 0, 0.9312211568478976), z_dir=(0, 1, 0))) as fillet1_2_piece_11:
        with BuildLine():
            CenterArc((0.73255268, 0.49983881), FILLET1_R, 158.625978152, 112.828923313)
            Line((0.266942102, 0.682066111), (0, 0))
            ThreePointArc((0, 0), (0.372623863, -0.00473124), (0.745247727, 0))
        make_face()
    extrude(amount=6.726238633, mode=Mode.SUBTRACT)
    with BuildSketch(Plane(origin=(9.715125927, 11.113983968, -11), x_dir=(-1, 0, 0), z_dir=(0, 1, 0)), Plane(origin=(-9.715125927, 11.113983968, 11), x_dir=(1, 0, 0), z_dir=(0, 1, 0))) as fillet1_2_piece_12:
        with BuildLine():
            CenterArc((0.191066067, 0.5), FILLET1_R, 227.790295209, 42.209704791)
            ThreePointArc((-0.144856962, 0.129654595), (-0.072643168, 0.064587437), (0, 0))
            Line((0, 0), (0.191066067, 0))
        make_face()
    extrude(amount=3.972032065, mode=Mode.SUBTRACT)


solid = part.part
